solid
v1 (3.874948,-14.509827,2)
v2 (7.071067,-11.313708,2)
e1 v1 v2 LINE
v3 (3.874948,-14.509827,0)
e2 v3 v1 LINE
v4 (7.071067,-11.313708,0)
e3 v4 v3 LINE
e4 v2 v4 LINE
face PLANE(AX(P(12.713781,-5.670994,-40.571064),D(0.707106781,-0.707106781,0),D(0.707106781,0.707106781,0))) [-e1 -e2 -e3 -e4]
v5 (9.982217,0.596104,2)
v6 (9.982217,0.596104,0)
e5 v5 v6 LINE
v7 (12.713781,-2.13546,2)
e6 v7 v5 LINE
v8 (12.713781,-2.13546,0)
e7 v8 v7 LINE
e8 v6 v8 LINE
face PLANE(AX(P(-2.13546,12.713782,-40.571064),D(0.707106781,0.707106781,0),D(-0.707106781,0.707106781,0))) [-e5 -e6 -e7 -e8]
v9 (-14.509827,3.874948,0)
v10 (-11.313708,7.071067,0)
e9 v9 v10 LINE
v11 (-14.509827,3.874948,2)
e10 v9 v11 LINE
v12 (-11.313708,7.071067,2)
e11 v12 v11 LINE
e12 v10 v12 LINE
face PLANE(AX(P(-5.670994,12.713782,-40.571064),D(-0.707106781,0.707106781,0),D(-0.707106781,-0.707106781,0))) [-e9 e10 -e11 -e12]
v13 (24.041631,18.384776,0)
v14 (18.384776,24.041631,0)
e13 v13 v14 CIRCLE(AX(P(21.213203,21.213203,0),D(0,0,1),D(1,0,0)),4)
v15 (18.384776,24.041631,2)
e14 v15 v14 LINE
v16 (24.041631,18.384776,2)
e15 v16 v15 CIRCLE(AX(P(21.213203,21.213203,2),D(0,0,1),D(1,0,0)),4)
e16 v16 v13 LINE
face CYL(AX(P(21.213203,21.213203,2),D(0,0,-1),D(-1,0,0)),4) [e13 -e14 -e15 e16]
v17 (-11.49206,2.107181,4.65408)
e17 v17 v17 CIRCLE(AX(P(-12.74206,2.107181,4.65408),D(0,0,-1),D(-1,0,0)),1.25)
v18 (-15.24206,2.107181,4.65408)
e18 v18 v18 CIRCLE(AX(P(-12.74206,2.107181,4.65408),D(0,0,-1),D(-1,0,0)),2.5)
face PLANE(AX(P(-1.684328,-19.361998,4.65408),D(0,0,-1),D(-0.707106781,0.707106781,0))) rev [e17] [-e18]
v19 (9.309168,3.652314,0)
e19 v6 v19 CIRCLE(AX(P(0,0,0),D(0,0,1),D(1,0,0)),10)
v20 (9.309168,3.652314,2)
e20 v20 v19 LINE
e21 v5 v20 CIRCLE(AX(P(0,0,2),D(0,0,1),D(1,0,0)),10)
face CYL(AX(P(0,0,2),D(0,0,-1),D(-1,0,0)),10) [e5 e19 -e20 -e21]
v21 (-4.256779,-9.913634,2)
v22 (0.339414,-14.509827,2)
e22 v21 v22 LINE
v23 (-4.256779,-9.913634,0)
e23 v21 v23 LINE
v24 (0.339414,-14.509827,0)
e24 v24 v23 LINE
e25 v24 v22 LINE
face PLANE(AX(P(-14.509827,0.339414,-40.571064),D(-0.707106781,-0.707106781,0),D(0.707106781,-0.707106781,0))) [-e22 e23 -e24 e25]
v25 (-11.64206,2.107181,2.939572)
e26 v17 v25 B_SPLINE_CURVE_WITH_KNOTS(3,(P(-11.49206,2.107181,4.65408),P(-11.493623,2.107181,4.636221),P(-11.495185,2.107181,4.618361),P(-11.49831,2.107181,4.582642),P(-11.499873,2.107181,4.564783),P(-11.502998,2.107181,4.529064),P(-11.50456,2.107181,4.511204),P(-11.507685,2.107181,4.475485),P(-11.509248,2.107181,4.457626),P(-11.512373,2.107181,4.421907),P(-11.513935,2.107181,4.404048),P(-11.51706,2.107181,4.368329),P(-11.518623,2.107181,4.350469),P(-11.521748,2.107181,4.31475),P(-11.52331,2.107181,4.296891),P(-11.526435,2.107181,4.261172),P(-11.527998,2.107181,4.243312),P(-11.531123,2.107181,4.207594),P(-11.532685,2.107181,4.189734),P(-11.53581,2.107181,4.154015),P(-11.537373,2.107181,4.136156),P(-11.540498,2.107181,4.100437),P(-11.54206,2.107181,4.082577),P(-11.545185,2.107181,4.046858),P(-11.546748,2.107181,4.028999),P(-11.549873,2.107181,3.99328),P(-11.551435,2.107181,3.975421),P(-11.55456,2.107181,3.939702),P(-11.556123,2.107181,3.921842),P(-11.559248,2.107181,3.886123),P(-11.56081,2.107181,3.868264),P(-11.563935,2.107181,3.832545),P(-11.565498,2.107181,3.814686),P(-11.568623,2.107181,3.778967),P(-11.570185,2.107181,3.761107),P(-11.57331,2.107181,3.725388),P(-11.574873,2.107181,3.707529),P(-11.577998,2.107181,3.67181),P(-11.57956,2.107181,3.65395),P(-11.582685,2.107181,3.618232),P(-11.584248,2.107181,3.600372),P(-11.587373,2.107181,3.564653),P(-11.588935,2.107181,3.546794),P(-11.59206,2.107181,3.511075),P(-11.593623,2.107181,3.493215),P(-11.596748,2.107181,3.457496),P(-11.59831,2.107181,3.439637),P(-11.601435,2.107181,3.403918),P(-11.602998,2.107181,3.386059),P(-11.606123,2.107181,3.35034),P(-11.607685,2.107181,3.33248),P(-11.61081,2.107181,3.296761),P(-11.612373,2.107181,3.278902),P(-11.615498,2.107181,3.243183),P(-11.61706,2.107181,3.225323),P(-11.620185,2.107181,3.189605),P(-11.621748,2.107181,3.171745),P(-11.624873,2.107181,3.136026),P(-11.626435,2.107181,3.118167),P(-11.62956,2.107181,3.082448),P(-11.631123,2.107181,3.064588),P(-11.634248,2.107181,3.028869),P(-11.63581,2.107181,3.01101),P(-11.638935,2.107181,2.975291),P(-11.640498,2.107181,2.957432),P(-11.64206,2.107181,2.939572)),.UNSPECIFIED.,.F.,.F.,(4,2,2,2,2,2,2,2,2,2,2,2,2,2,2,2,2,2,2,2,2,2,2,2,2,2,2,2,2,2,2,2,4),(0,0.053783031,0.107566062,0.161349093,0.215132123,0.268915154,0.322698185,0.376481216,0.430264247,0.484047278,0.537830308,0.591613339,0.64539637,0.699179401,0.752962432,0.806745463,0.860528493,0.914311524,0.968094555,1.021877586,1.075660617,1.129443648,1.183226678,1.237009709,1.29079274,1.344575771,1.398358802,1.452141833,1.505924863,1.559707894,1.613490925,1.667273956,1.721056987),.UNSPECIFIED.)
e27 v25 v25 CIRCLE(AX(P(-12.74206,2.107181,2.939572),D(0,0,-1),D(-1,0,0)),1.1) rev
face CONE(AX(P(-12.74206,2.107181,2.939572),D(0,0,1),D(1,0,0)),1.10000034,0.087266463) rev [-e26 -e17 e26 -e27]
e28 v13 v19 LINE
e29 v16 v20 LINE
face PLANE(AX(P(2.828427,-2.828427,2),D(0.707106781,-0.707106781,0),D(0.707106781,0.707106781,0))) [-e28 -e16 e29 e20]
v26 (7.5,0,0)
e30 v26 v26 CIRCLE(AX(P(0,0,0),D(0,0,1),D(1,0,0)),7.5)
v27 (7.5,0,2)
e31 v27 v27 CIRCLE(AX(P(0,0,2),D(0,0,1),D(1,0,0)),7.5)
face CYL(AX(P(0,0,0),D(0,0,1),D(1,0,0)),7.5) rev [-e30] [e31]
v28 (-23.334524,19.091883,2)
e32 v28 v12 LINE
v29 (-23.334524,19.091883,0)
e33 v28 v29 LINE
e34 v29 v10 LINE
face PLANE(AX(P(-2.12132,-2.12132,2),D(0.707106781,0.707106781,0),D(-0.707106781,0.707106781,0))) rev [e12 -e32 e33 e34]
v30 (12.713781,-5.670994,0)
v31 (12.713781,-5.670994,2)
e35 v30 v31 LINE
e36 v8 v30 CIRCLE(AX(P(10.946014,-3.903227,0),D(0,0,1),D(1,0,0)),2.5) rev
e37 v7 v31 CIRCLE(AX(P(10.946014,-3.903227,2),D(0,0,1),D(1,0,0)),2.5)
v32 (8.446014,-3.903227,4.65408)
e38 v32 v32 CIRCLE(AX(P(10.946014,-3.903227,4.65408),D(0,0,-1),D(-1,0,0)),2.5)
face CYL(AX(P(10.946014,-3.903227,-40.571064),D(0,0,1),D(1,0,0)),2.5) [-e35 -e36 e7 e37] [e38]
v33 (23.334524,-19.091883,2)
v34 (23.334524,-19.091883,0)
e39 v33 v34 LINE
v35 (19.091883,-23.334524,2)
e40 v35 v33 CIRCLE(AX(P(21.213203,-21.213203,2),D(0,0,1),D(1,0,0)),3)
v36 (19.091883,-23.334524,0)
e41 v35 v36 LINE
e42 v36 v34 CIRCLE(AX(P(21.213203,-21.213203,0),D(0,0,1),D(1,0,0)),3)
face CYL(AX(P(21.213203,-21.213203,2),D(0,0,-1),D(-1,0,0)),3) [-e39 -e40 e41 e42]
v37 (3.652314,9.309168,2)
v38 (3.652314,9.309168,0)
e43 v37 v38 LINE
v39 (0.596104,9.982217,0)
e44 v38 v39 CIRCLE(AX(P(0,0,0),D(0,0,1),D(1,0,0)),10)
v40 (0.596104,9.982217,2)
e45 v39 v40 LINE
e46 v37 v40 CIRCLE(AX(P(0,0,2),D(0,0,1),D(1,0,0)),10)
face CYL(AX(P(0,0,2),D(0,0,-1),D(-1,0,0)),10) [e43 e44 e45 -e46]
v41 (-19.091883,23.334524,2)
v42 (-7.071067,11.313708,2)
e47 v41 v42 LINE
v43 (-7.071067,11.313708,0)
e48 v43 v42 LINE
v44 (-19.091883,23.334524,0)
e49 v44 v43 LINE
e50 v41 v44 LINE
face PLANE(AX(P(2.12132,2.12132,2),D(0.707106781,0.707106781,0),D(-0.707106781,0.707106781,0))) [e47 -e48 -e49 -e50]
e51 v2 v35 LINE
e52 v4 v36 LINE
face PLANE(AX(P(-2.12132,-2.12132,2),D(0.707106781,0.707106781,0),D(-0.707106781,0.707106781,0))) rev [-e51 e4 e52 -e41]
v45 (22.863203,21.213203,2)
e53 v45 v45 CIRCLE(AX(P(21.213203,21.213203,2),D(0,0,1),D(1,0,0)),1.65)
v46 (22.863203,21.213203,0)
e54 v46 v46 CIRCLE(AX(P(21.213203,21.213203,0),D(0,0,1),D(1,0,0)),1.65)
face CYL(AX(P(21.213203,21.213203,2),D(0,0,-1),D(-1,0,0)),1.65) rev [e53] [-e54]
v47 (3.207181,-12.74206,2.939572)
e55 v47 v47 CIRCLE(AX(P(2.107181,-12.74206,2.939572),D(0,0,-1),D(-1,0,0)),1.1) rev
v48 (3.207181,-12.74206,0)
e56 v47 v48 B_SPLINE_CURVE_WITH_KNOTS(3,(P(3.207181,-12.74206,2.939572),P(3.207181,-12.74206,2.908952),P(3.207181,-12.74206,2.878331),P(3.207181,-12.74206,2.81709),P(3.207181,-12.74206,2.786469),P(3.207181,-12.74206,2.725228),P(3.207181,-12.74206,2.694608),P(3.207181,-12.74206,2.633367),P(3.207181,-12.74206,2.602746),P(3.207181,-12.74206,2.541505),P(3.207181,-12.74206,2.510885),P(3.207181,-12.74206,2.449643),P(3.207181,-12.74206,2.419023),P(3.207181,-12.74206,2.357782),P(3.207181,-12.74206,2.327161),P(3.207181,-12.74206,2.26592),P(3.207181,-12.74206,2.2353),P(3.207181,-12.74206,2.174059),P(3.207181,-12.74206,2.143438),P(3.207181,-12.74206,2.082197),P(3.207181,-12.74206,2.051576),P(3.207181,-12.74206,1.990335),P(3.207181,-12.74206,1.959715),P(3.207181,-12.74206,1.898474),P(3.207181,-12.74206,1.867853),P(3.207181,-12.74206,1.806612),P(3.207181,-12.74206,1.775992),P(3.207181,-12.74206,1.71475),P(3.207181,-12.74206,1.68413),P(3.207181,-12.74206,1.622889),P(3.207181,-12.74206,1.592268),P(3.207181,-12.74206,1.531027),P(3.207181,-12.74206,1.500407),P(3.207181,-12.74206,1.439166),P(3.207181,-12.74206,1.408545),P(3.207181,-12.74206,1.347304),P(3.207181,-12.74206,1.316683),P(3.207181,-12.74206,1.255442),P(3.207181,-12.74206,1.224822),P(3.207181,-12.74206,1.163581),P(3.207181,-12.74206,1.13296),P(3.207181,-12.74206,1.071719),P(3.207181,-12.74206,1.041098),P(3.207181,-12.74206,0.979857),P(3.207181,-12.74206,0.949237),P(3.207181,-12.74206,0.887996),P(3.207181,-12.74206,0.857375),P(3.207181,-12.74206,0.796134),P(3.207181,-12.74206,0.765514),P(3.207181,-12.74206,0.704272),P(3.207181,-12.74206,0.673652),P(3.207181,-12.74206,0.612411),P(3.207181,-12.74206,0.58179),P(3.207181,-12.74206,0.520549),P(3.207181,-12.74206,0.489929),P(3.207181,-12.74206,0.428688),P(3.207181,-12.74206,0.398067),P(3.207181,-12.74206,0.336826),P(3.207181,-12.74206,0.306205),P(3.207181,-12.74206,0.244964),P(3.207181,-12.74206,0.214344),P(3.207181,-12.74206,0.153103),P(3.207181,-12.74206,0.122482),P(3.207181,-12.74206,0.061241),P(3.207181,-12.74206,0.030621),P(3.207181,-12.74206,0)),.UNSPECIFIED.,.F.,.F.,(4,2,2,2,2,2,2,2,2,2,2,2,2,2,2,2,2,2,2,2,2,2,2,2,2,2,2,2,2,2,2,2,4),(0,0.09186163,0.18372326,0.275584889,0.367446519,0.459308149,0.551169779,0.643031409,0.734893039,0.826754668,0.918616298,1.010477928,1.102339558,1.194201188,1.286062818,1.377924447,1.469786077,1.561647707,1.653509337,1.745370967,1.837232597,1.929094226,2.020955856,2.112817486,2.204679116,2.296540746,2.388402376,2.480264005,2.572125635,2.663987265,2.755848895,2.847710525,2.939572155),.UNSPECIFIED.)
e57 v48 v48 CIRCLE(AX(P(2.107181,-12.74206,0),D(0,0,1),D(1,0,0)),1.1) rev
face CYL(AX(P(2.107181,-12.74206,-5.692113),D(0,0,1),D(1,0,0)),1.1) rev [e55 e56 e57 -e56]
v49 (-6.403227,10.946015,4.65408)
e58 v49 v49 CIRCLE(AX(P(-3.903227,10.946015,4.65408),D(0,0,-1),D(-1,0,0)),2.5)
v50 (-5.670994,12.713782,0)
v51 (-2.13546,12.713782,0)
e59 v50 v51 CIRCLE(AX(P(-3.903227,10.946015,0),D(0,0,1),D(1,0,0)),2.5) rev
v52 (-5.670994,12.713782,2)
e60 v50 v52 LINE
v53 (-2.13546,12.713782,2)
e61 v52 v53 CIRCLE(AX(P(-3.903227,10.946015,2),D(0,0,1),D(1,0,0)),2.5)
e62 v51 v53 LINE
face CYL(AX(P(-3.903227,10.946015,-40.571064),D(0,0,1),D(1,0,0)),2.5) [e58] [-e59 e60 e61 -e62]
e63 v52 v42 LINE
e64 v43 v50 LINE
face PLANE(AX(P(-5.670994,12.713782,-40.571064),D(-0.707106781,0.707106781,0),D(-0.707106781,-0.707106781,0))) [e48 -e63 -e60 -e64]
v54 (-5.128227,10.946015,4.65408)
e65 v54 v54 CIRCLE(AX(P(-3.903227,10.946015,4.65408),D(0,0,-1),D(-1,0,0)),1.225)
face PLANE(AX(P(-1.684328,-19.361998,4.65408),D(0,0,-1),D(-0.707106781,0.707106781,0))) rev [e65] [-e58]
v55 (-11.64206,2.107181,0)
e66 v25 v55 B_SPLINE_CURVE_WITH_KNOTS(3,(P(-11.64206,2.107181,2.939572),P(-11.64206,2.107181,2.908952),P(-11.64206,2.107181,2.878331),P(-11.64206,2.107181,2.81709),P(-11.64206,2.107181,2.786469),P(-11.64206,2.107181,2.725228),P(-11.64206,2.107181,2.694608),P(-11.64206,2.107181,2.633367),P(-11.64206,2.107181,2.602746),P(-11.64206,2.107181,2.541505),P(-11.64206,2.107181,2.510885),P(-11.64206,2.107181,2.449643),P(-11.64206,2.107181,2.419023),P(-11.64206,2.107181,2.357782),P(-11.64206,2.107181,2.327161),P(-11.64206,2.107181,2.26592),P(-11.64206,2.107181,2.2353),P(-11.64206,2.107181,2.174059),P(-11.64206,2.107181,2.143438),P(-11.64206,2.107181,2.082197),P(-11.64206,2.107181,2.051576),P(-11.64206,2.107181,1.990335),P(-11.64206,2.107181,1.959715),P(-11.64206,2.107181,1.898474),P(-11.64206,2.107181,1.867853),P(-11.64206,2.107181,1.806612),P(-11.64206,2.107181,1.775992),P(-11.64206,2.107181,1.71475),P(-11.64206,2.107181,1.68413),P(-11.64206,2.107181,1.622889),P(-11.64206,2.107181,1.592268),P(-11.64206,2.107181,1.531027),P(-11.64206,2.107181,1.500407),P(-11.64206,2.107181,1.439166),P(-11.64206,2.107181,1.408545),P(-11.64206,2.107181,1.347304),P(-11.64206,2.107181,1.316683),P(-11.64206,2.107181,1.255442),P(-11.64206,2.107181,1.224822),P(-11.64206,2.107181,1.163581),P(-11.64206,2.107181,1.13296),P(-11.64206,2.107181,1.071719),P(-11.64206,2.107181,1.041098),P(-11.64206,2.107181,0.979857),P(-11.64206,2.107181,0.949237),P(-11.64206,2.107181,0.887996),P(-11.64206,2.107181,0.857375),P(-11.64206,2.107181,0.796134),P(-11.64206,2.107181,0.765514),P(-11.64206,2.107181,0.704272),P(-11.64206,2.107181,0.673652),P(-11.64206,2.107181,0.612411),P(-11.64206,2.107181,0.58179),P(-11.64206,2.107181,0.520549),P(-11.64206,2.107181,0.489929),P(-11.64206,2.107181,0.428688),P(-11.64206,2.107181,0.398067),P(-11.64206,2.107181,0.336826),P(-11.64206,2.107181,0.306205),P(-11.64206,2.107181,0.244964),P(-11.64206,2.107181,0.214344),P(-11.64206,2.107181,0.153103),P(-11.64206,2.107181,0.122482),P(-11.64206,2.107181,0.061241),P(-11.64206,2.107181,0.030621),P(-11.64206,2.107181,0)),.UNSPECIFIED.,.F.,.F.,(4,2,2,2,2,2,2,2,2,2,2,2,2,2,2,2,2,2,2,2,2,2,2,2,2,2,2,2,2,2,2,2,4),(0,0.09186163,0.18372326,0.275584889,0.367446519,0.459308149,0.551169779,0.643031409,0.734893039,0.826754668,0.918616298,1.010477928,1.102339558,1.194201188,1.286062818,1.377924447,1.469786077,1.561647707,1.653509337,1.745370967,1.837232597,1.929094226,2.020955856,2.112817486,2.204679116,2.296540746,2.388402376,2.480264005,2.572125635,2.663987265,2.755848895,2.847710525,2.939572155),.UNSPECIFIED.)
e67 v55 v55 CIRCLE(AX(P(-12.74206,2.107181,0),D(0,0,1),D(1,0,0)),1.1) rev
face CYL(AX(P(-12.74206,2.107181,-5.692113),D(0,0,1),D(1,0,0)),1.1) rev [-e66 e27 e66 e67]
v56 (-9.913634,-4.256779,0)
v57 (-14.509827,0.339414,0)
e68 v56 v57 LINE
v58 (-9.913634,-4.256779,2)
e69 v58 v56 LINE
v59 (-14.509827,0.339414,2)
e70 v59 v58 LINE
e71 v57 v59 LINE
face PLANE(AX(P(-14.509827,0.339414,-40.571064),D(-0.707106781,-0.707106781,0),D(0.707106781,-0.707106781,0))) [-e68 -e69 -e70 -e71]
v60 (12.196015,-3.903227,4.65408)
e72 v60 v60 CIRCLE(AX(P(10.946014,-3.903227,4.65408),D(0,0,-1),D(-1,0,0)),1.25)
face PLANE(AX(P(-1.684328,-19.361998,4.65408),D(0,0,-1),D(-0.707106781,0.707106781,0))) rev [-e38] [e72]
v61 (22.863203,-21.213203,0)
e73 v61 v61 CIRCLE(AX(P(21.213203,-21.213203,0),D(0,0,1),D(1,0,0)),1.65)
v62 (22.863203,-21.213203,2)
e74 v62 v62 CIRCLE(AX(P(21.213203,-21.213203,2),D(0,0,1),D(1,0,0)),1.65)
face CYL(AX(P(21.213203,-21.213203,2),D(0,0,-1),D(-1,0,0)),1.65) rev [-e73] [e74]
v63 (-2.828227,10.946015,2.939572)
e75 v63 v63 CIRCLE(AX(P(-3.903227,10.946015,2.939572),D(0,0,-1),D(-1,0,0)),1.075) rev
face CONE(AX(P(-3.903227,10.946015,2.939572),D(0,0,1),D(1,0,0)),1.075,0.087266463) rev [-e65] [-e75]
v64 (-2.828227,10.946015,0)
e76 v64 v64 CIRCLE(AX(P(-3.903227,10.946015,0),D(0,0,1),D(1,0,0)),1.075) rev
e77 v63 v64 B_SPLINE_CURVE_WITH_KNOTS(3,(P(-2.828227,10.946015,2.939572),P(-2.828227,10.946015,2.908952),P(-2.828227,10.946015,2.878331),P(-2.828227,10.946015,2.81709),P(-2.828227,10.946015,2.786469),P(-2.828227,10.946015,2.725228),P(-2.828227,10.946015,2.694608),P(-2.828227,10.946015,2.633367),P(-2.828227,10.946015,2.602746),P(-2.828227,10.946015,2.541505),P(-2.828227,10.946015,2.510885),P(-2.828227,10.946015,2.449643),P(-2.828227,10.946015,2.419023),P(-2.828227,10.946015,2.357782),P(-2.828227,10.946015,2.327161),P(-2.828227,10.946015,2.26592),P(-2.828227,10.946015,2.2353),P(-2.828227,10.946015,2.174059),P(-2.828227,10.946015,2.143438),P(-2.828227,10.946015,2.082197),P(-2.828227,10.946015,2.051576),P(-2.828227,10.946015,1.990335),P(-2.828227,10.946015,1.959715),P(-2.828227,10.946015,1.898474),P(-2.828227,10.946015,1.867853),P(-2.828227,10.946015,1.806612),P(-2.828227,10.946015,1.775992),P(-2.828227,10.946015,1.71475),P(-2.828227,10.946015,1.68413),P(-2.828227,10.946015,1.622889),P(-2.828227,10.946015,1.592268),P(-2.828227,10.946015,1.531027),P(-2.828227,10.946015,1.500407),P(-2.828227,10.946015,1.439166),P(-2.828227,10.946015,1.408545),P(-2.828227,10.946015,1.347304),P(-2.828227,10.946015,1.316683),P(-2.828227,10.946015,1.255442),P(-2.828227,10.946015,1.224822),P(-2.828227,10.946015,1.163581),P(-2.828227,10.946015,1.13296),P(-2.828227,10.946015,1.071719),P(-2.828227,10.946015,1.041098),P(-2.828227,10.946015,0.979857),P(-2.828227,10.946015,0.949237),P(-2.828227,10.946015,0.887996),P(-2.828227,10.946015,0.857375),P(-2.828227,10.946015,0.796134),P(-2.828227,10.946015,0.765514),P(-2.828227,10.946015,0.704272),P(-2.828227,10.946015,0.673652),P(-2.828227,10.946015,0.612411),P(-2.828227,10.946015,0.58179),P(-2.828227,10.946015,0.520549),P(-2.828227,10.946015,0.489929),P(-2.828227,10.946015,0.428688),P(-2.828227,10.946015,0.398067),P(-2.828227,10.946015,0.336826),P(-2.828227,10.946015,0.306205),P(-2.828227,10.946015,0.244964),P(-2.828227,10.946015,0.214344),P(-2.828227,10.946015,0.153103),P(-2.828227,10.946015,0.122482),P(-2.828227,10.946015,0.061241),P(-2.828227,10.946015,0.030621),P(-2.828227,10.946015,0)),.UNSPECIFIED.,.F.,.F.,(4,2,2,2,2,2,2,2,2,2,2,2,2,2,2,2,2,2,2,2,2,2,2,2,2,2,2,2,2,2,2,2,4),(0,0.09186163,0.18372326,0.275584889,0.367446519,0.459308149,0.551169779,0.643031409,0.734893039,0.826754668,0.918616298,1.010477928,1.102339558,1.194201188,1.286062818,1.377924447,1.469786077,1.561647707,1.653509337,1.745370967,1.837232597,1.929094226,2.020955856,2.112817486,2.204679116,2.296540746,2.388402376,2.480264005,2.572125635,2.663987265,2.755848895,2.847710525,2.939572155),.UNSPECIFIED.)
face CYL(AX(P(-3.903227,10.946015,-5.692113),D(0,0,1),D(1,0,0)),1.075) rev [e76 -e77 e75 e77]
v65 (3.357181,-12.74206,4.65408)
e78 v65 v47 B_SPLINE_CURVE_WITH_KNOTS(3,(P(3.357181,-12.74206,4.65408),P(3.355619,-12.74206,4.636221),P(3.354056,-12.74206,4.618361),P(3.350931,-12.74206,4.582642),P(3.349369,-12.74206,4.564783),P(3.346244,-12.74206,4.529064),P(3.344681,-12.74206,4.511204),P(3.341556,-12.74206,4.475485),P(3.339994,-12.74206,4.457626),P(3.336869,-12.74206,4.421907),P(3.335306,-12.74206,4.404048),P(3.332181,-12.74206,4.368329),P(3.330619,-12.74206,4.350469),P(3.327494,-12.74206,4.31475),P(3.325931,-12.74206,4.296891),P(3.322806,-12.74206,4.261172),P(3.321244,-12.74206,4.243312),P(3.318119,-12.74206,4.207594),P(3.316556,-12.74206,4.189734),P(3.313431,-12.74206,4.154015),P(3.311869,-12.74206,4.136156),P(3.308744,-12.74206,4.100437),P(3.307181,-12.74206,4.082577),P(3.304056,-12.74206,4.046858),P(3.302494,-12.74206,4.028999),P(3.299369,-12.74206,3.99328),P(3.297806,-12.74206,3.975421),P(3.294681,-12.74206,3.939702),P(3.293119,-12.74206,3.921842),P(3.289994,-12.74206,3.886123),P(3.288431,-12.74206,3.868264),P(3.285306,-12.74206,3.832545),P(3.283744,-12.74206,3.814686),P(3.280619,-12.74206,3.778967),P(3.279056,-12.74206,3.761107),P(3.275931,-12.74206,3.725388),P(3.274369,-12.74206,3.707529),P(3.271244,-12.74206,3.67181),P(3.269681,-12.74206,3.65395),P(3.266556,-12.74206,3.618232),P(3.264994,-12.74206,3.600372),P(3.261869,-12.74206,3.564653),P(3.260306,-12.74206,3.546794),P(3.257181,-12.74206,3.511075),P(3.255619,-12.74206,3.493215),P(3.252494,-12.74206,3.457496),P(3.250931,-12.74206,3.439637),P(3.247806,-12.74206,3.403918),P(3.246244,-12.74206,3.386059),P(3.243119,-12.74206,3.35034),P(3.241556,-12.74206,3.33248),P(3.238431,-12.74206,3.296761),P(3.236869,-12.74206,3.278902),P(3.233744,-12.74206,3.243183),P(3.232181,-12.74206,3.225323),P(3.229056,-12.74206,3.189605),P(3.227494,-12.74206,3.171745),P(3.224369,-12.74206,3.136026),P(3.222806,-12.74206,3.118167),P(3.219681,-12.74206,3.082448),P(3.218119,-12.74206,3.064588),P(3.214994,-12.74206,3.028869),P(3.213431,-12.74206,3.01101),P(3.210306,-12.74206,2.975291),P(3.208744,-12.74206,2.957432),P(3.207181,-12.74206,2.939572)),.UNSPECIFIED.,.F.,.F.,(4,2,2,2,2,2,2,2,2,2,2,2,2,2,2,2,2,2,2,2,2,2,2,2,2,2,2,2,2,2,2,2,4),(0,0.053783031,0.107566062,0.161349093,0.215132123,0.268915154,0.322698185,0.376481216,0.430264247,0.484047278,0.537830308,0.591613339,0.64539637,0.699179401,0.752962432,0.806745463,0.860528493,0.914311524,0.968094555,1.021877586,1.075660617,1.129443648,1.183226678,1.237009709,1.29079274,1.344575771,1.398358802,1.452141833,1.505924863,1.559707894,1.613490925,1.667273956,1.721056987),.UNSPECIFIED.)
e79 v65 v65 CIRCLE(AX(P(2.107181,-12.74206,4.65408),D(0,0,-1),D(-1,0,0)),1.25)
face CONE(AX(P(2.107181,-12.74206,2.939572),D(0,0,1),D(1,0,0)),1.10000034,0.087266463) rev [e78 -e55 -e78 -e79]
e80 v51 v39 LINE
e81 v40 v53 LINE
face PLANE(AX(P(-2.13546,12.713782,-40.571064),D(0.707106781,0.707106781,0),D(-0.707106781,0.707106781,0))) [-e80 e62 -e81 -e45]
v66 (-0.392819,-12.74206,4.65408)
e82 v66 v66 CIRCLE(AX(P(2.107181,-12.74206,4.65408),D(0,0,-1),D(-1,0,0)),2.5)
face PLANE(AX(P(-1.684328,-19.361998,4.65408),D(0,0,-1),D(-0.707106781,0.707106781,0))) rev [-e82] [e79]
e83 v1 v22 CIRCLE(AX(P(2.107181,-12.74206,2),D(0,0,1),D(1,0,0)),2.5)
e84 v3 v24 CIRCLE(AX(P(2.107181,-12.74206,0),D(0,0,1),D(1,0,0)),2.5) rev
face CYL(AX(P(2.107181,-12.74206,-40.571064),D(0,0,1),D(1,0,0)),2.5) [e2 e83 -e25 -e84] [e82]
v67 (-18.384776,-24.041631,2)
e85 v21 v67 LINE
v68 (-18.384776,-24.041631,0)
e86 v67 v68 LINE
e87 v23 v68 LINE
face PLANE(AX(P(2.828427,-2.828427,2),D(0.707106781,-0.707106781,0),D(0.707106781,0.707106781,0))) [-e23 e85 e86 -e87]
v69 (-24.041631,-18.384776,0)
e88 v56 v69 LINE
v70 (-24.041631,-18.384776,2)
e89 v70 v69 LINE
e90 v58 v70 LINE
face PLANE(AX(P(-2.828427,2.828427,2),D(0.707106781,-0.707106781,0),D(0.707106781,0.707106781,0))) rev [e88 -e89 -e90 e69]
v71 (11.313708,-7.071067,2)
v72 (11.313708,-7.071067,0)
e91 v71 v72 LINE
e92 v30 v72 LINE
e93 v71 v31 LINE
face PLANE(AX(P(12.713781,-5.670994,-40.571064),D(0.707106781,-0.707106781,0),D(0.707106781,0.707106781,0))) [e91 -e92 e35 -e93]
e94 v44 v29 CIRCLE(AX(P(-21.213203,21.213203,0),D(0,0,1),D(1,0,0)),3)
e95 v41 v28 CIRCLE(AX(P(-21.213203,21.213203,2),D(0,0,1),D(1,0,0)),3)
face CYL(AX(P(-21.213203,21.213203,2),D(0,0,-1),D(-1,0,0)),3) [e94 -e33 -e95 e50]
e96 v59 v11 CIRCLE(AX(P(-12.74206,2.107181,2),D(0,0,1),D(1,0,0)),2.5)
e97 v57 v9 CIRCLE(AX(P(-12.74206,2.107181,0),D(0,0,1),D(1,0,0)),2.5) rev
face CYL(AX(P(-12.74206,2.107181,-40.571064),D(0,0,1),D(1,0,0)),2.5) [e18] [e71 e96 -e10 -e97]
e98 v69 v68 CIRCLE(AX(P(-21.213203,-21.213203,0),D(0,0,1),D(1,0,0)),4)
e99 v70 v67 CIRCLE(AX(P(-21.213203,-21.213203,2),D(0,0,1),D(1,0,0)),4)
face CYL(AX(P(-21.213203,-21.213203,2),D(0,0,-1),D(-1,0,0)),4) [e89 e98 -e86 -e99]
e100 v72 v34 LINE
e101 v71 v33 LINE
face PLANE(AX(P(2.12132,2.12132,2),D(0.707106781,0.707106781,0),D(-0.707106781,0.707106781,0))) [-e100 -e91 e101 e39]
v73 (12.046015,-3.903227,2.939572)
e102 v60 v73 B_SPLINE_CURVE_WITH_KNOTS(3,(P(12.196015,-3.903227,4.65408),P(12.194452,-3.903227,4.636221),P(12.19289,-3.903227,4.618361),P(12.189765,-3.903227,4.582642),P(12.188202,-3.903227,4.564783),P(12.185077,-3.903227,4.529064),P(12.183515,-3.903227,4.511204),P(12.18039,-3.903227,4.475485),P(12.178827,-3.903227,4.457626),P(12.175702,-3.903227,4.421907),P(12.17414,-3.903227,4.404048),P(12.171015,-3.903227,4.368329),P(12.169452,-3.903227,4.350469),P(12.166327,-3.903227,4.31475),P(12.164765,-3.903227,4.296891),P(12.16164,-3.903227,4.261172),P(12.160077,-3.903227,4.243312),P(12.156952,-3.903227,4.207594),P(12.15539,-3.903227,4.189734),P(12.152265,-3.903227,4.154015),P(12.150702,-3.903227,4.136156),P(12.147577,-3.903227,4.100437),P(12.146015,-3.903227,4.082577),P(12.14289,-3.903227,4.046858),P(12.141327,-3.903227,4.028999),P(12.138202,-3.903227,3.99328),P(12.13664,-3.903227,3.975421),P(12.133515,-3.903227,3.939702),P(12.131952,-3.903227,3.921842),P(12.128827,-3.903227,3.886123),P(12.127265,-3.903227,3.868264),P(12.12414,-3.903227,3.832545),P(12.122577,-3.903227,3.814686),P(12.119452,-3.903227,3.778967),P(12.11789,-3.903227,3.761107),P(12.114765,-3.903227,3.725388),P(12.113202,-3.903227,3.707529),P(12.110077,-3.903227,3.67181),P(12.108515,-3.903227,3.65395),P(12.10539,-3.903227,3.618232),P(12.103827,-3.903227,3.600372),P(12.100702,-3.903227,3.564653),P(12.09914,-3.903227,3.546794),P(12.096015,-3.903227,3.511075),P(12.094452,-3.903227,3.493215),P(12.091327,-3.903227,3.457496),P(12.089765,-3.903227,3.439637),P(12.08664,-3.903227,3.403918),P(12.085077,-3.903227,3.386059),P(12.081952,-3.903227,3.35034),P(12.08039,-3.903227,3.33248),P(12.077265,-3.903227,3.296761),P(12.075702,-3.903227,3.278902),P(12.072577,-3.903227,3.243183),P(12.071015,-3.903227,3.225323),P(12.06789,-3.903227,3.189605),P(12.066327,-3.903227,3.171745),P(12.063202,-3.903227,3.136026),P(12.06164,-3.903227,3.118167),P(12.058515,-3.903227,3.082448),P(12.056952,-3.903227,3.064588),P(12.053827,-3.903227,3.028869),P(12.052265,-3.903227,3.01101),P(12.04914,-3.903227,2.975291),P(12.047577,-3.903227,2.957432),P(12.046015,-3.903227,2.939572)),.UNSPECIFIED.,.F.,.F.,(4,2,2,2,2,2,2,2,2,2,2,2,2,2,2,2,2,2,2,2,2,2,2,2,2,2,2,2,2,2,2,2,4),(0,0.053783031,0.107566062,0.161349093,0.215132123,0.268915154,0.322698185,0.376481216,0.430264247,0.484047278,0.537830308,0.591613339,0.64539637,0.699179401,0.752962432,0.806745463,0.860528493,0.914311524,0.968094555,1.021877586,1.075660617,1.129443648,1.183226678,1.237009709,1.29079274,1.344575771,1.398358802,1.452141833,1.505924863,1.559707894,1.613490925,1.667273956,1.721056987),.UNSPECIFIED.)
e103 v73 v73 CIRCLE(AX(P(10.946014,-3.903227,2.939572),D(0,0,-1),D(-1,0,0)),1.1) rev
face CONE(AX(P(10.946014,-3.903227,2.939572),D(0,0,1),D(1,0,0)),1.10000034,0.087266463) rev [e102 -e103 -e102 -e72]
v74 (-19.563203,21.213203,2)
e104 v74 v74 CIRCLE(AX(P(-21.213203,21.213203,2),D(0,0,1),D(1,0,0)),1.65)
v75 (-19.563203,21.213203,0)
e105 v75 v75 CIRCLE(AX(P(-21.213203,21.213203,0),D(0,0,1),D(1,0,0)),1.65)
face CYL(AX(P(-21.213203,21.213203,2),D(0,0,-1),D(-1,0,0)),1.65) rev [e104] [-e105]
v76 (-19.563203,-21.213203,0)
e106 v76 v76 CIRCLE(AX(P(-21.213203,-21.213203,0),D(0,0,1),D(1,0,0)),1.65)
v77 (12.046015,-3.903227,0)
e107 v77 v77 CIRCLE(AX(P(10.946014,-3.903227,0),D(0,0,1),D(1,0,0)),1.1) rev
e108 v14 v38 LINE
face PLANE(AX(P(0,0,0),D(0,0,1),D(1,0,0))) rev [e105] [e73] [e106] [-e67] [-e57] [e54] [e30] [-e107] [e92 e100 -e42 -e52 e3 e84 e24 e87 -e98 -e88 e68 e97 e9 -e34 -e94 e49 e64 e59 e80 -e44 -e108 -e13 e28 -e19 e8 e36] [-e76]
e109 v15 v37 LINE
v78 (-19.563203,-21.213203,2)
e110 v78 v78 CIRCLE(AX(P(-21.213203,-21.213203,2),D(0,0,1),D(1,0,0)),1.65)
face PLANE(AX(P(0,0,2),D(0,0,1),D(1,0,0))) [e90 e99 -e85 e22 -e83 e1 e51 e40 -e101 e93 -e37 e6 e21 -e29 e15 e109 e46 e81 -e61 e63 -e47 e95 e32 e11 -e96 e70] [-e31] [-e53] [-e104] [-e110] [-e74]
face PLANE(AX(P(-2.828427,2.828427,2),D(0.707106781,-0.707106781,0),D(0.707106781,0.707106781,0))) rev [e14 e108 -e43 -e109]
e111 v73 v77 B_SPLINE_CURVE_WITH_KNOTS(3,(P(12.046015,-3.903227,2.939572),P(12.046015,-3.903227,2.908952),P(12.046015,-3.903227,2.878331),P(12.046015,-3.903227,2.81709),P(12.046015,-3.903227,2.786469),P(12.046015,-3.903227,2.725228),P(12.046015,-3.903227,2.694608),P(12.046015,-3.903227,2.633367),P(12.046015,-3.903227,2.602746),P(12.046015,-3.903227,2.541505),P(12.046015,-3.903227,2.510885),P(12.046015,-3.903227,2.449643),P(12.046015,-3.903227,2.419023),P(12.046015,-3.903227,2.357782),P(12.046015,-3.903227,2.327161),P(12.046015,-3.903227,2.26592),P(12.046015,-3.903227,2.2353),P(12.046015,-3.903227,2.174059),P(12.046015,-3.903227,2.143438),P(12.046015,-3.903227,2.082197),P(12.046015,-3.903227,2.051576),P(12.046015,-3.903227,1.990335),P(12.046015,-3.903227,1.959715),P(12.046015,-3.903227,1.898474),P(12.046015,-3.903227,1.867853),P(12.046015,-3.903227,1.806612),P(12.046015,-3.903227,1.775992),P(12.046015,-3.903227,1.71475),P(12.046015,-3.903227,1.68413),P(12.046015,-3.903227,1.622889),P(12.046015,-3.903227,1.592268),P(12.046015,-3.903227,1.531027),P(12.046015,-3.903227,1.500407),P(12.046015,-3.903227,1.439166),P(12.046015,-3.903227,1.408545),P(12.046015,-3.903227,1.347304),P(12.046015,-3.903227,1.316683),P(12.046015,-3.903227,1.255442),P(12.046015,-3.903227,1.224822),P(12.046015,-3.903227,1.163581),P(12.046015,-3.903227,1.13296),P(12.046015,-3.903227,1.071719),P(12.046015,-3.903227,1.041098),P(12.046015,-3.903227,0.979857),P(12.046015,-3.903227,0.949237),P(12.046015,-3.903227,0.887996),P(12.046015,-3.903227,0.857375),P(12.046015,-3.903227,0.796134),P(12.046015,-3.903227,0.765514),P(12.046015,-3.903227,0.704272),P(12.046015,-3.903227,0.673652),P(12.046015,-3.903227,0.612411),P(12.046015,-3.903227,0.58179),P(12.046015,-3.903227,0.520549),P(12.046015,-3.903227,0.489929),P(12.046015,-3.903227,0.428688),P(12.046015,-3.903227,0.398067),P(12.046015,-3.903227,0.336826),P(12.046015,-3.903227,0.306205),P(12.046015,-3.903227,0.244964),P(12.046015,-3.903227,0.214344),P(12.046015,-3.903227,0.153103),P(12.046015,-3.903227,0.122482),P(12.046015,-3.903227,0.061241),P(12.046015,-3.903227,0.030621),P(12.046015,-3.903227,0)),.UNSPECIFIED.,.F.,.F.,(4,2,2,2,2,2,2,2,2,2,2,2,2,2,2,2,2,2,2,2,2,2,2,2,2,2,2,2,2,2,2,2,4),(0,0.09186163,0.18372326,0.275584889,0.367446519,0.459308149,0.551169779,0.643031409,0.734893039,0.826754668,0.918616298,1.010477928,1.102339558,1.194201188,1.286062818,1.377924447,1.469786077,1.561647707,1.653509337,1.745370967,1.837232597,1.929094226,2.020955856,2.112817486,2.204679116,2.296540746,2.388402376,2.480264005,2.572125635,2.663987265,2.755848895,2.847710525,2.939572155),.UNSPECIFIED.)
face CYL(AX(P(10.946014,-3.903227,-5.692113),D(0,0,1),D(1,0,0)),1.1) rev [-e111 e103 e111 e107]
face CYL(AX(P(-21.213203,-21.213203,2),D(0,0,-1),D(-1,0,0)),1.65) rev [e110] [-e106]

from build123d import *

# Parameters (mm, degrees)
SKETCH1_R           = 1.65
BOSS_EXTRUDE1_DEPTH = 2
SKETCH2_R           = 1.25
BOSS_EXTRUDE2_DEPTH = 2
SKETCH3_R           = 7.5
CUT_EXTRUDE1_DEPTH  = 2
BOSS_EXTRUDE3_START = 2.65408
SKETCH4_R           = 2.5
SKETCH4_R_2         = 1.25
BOSS_EXTRUDE3_DEPTH = 2.65408
SKETCH5_R           = 1.797788616
SKETCH5_R_2         = 1.10000034
SKETCH5_R_3         = 2.012466026
SKETCH5_R_4         = 1.729091626
SKETCH5_R_5         = 1.81324602
SKETCH5_R_6         = 1.075
BOSS_EXTRUDE4_DEPTH = 4.65408
CHAMFER1_SIZE       = 1.714507845
CHAMFER1_SIZE_2     = 0.15


with BuildPart() as part:
    # Sketch1 → Boss-Extrude1 (new body)
    with BuildSketch(Plane.XY):
        with BuildLine():
            Line((24.04163056, 18.384776311), (9.309167823, 3.652313574))
            ThreePointArc((9.309167823, 3.652313574), (9.985739131, -0.533867035), (8.866689125, -4.624048438))
            Line((8.866689125, -4.624048438), (23.334523779, -19.091883092))
            ThreePointArc((23.334523779, -19.091883092), (23.334523779, -23.334523779), (19.091883092, -23.334523779))
            Line((19.091883092, -23.334523779), (4.624048438, -8.866689125))
            ThreePointArc((4.624048438, -8.866689125), (0.533867035, -9.985739131), (-3.652313574, -9.309167823))
            Line((-3.652313574, -9.309167823), (-18.384776311, -24.04163056))
            ThreePointArc((-18.384776311, -24.04163056), (-24.04163056, -24.04163056), (-24.04163056, -18.384776311))
            Line((-24.04163056, -18.384776311), (-9.309167823, -3.652313574))
            ThreePointArc((-9.309167823, -3.652313574), (-9.985739131, 0.533867035), (-8.866689125, 4.624048438))
            Line((-8.866689125, 4.624048438), (-23.334523779, 19.091883092))
            ThreePointArc((-23.334523779, 19.091883092), (-23.334523779, 23.334523779), (-19.091883092, 23.334523779))
            Line((-19.091883092, 23.334523779), (-4.624048438, 8.866689125))
            ThreePointArc((-4.624048438, 8.866689125), (-0.533867035, 9.985739131), (3.652313574, 9.309167823))
            Line((3.652313574, 9.309167823), (18.384776311, 24.04163056))
            ThreePointArc((18.384776311, 24.04163056), (24.04163056, 24.04163056), (24.04163056, 18.384776311))
        make_face()
        with Locations((21.213203436, -21.213203436)):
            Circle(SKETCH1_R, mode=Mode.SUBTRACT)
        with Locations((21.213203436, 21.213203436)):
            Circle(SKETCH1_R, mode=Mode.SUBTRACT)
        with Locations((-21.213203436, 21.213203436)):
            Circle(SKETCH1_R, mode=Mode.SUBTRACT)
        with Locations((-21.213203436, -21.213203436)):
            Circle(SKETCH1_R, mode=Mode.SUBTRACT)
    extrude(amount=BOSS_EXTRUDE1_DEPTH)

    # Sketch2 → Boss-Extrude2 (add)
    with BuildSketch(Plane.XY.offset(2)):
        with BuildLine():
            Line((-2.135460216, 12.713781538), (12.713781227, -2.135459905))
            ThreePointArc((12.713781227, -2.135459905), (13.446014274, -3.903226858), (12.713781227, -5.670993811))
            Line((12.713781227, -5.670993811), (3.874947975, -14.509827063))
            ThreePointArc((3.874947975, -14.509827063), (2.107181022, -15.24206011), (0.339414069, -14.509827063))
            Line((0.339414069, -14.509827063), (-14.509827374, 0.33941438))
            ThreePointArc((-14.509827374, 0.33941438), (-15.242060421, 2.107181333), (-14.509827374, 3.874948286))
            Line((-14.509827374, 3.874948286), (-5.670994122, 12.713781538))
            ThreePointArc((-5.670994122, 12.713781538), (-3.903227169, 13.446014585), (-2.135460216, 12.713781538))
        make_face()
        with Locations((-3.903227169, 10.946014585)):
            Circle(SKETCH2_R, mode=Mode.SUBTRACT)
        with Locations((10.946014274, -3.903226858)):
            Circle(SKETCH2_R, mode=Mode.SUBTRACT)
        with Locations((2.107181022, -12.74206011)):
            Circle(SKETCH2_R, mode=Mode.SUBTRACT)
        with Locations((-12.742060421, 2.107181333)):
            Circle(SKETCH2_R, mode=Mode.SUBTRACT)
    extrude(amount=-BOSS_EXTRUDE2_DEPTH)

    # Sketch3 → Cut-Extrude1 (cut)
    with BuildSketch(Plane.XY.offset(2)):
        Circle(SKETCH3_R)
    extrude(amount=-CUT_EXTRUDE1_DEPTH, mode=Mode.SUBTRACT)

    # Sketch4 → Boss-Extrude3 (add)
    # profile 1 of 4: a face of its own
    with BuildSketch(Plane.XY.offset(2).offset(BOSS_EXTRUDE3_START)):
        with Locations(Location((-3.903227169, 10.946014585, 0), (0, 0, 45))):
            Circle(SKETCH4_R)
        with Locations((-3.903227169, 10.946014585)):
            Circle(SKETCH4_R_2, mode=Mode.SUBTRACT)
    # profile 2 of 4: a face of its own
    with BuildSketch(Plane.XY.offset(2).offset(BOSS_EXTRUDE3_START)):
        with Locations(Location((-12.742060421, 2.107181333, 0), (0, 0, 135))):
            Circle(SKETCH4_R)
        with Locations((-12.742060421, 2.107181333)):
            Circle(SKETCH4_R_2, mode=Mode.SUBTRACT)
    # profile 3 of 4: a face of its own
    with BuildSketch(Plane.XY.offset(2).offset(BOSS_EXTRUDE3_START)):
        with Locations(Location((10.946014274, -3.903226858, 0), (0, 0, 45))):
            Circle(SKETCH4_R)
        with Locations((10.946014274, -3.903226858)):
            Circle(SKETCH4_R_2, mode=Mode.SUBTRACT)
    # profile 4 of 4: a face of its own
    with BuildSketch(Plane.XY.offset(2).offset(BOSS_EXTRUDE3_START)):
        with Locations(Location((2.107181022, -12.74206011, 0), (0, 0, 315))):
            Circle(SKETCH4_R)
        with Locations((2.107181022, -12.74206011)):
            Circle(SKETCH4_R_2, mode=Mode.SUBTRACT)
    extrude(amount=-BOSS_EXTRUDE3_DEPTH)

    # Sketch5 → Boss-Extrude4 (add)
    # profile 1 of 4: a face of its own
    with BuildSketch(Plane.XY.offset(4.65408)):
        with Locations((10.946014274, -3.903226858)):
            Circle(SKETCH5_R)
        with Locations((10.946014274, -3.903226858)):
            Circle(SKETCH5_R_2, mode=Mode.SUBTRACT)
    # profile 2 of 4: a face of its own
    with BuildSketch(Plane.XY.offset(4.65408)):
        with Locations((2.107181022, -12.74206011)):
            Circle(SKETCH5_R_3)
        with Locations((2.107181022, -12.74206011)):
            Circle(SKETCH5_R_2, mode=Mode.SUBTRACT)
    # profile 3 of 4: a face of its own
    with BuildSketch(Plane.XY.offset(4.65408)):
        with Locations((-12.742060421, 2.107181333)):
            Circle(SKETCH5_R_4)
        with Locations((-12.742060421, 2.107181333)):
            Circle(SKETCH5_R_2, mode=Mode.SUBTRACT)
    # profile 4 of 4: a face of its own
    with BuildSketch(Plane.XY.offset(4.65408)):
        with Locations((-3.903227169, 10.946014585)):
            Circle(SKETCH5_R_5)
        with Locations((-3.903227169, 10.946014585)):
            Circle(SKETCH5_R_6, mode=Mode.SUBTRACT)
    extrude(amount=-BOSS_EXTRUDE4_DEPTH)

    # Chamfer1
    # the kernel refuses this chamfer: 1.714507845, 0.15 mm, written as the material it takes off along each edge
    with BuildSketch(Plane(origin=(10.946014274, -3.903226858, 4.65408), x_dir=(1, 0, 0), z_dir=(0, -1, 0))) as chamfer1_piece_1:
        Polygon((1.10000034, -CHAMFER1_SIZE), (1.10000034 + CHAMFER1_SIZE_2, 0), (1.10000034, 0), align=None)
    revolve(axis=Axis((10.946014274, -3.903226858, 4.65408), (0, 0, 1)), mode=Mode.SUBTRACT)
    with BuildSketch(Plane(origin=(2.107181022, -12.74206011, 4.65408), x_dir=(1, 0, 0), z_dir=(0, -1, 0))) as chamfer1_piece_2:
        Polygon((1.10000034, -CHAMFER1_SIZE), (1.10000034 + CHAMFER1_SIZE_2, 0), (1.10000034, 0), align=None)
    revolve(axis=Axis((2.107181022, -12.74206011, 4.65408), (0, 0, 1)), mode=Mode.SUBTRACT)
    with BuildSketch(Plane(origin=(-12.742060421, 2.107181333, 4.65408), x_dir=(1, 0, 0), z_dir=(0, -1, 0))) as chamfer1_piece_3:
        Polygon((1.10000034, -CHAMFER1_SIZE), (1.10000034 + CHAMFER1_SIZE_2, 0), (1.10000034, 0), align=None)
    revolve(axis=Axis((-12.742060421, 2.107181333, 4.65408), (0, 0, 1)), mode=Mode.SUBTRACT)
    with BuildSketch(Plane(origin=(-3.903227169, 10.946014585, 4.65408), x_dir=(1, 0, 0), z_dir=(0, -1, 0))) as chamfer1_piece_4:
        Polygon((1.075, -CHAMFER1_SIZE), (1.075 + CHAMFER1_SIZE_2, 0), (1.075, 0), align=None)
    revolve(axis=Axis((-3.903227169, 10.946014585, 4.65408), (0, 0, 1)), mode=Mode.SUBTRACT)


solid = part.part
